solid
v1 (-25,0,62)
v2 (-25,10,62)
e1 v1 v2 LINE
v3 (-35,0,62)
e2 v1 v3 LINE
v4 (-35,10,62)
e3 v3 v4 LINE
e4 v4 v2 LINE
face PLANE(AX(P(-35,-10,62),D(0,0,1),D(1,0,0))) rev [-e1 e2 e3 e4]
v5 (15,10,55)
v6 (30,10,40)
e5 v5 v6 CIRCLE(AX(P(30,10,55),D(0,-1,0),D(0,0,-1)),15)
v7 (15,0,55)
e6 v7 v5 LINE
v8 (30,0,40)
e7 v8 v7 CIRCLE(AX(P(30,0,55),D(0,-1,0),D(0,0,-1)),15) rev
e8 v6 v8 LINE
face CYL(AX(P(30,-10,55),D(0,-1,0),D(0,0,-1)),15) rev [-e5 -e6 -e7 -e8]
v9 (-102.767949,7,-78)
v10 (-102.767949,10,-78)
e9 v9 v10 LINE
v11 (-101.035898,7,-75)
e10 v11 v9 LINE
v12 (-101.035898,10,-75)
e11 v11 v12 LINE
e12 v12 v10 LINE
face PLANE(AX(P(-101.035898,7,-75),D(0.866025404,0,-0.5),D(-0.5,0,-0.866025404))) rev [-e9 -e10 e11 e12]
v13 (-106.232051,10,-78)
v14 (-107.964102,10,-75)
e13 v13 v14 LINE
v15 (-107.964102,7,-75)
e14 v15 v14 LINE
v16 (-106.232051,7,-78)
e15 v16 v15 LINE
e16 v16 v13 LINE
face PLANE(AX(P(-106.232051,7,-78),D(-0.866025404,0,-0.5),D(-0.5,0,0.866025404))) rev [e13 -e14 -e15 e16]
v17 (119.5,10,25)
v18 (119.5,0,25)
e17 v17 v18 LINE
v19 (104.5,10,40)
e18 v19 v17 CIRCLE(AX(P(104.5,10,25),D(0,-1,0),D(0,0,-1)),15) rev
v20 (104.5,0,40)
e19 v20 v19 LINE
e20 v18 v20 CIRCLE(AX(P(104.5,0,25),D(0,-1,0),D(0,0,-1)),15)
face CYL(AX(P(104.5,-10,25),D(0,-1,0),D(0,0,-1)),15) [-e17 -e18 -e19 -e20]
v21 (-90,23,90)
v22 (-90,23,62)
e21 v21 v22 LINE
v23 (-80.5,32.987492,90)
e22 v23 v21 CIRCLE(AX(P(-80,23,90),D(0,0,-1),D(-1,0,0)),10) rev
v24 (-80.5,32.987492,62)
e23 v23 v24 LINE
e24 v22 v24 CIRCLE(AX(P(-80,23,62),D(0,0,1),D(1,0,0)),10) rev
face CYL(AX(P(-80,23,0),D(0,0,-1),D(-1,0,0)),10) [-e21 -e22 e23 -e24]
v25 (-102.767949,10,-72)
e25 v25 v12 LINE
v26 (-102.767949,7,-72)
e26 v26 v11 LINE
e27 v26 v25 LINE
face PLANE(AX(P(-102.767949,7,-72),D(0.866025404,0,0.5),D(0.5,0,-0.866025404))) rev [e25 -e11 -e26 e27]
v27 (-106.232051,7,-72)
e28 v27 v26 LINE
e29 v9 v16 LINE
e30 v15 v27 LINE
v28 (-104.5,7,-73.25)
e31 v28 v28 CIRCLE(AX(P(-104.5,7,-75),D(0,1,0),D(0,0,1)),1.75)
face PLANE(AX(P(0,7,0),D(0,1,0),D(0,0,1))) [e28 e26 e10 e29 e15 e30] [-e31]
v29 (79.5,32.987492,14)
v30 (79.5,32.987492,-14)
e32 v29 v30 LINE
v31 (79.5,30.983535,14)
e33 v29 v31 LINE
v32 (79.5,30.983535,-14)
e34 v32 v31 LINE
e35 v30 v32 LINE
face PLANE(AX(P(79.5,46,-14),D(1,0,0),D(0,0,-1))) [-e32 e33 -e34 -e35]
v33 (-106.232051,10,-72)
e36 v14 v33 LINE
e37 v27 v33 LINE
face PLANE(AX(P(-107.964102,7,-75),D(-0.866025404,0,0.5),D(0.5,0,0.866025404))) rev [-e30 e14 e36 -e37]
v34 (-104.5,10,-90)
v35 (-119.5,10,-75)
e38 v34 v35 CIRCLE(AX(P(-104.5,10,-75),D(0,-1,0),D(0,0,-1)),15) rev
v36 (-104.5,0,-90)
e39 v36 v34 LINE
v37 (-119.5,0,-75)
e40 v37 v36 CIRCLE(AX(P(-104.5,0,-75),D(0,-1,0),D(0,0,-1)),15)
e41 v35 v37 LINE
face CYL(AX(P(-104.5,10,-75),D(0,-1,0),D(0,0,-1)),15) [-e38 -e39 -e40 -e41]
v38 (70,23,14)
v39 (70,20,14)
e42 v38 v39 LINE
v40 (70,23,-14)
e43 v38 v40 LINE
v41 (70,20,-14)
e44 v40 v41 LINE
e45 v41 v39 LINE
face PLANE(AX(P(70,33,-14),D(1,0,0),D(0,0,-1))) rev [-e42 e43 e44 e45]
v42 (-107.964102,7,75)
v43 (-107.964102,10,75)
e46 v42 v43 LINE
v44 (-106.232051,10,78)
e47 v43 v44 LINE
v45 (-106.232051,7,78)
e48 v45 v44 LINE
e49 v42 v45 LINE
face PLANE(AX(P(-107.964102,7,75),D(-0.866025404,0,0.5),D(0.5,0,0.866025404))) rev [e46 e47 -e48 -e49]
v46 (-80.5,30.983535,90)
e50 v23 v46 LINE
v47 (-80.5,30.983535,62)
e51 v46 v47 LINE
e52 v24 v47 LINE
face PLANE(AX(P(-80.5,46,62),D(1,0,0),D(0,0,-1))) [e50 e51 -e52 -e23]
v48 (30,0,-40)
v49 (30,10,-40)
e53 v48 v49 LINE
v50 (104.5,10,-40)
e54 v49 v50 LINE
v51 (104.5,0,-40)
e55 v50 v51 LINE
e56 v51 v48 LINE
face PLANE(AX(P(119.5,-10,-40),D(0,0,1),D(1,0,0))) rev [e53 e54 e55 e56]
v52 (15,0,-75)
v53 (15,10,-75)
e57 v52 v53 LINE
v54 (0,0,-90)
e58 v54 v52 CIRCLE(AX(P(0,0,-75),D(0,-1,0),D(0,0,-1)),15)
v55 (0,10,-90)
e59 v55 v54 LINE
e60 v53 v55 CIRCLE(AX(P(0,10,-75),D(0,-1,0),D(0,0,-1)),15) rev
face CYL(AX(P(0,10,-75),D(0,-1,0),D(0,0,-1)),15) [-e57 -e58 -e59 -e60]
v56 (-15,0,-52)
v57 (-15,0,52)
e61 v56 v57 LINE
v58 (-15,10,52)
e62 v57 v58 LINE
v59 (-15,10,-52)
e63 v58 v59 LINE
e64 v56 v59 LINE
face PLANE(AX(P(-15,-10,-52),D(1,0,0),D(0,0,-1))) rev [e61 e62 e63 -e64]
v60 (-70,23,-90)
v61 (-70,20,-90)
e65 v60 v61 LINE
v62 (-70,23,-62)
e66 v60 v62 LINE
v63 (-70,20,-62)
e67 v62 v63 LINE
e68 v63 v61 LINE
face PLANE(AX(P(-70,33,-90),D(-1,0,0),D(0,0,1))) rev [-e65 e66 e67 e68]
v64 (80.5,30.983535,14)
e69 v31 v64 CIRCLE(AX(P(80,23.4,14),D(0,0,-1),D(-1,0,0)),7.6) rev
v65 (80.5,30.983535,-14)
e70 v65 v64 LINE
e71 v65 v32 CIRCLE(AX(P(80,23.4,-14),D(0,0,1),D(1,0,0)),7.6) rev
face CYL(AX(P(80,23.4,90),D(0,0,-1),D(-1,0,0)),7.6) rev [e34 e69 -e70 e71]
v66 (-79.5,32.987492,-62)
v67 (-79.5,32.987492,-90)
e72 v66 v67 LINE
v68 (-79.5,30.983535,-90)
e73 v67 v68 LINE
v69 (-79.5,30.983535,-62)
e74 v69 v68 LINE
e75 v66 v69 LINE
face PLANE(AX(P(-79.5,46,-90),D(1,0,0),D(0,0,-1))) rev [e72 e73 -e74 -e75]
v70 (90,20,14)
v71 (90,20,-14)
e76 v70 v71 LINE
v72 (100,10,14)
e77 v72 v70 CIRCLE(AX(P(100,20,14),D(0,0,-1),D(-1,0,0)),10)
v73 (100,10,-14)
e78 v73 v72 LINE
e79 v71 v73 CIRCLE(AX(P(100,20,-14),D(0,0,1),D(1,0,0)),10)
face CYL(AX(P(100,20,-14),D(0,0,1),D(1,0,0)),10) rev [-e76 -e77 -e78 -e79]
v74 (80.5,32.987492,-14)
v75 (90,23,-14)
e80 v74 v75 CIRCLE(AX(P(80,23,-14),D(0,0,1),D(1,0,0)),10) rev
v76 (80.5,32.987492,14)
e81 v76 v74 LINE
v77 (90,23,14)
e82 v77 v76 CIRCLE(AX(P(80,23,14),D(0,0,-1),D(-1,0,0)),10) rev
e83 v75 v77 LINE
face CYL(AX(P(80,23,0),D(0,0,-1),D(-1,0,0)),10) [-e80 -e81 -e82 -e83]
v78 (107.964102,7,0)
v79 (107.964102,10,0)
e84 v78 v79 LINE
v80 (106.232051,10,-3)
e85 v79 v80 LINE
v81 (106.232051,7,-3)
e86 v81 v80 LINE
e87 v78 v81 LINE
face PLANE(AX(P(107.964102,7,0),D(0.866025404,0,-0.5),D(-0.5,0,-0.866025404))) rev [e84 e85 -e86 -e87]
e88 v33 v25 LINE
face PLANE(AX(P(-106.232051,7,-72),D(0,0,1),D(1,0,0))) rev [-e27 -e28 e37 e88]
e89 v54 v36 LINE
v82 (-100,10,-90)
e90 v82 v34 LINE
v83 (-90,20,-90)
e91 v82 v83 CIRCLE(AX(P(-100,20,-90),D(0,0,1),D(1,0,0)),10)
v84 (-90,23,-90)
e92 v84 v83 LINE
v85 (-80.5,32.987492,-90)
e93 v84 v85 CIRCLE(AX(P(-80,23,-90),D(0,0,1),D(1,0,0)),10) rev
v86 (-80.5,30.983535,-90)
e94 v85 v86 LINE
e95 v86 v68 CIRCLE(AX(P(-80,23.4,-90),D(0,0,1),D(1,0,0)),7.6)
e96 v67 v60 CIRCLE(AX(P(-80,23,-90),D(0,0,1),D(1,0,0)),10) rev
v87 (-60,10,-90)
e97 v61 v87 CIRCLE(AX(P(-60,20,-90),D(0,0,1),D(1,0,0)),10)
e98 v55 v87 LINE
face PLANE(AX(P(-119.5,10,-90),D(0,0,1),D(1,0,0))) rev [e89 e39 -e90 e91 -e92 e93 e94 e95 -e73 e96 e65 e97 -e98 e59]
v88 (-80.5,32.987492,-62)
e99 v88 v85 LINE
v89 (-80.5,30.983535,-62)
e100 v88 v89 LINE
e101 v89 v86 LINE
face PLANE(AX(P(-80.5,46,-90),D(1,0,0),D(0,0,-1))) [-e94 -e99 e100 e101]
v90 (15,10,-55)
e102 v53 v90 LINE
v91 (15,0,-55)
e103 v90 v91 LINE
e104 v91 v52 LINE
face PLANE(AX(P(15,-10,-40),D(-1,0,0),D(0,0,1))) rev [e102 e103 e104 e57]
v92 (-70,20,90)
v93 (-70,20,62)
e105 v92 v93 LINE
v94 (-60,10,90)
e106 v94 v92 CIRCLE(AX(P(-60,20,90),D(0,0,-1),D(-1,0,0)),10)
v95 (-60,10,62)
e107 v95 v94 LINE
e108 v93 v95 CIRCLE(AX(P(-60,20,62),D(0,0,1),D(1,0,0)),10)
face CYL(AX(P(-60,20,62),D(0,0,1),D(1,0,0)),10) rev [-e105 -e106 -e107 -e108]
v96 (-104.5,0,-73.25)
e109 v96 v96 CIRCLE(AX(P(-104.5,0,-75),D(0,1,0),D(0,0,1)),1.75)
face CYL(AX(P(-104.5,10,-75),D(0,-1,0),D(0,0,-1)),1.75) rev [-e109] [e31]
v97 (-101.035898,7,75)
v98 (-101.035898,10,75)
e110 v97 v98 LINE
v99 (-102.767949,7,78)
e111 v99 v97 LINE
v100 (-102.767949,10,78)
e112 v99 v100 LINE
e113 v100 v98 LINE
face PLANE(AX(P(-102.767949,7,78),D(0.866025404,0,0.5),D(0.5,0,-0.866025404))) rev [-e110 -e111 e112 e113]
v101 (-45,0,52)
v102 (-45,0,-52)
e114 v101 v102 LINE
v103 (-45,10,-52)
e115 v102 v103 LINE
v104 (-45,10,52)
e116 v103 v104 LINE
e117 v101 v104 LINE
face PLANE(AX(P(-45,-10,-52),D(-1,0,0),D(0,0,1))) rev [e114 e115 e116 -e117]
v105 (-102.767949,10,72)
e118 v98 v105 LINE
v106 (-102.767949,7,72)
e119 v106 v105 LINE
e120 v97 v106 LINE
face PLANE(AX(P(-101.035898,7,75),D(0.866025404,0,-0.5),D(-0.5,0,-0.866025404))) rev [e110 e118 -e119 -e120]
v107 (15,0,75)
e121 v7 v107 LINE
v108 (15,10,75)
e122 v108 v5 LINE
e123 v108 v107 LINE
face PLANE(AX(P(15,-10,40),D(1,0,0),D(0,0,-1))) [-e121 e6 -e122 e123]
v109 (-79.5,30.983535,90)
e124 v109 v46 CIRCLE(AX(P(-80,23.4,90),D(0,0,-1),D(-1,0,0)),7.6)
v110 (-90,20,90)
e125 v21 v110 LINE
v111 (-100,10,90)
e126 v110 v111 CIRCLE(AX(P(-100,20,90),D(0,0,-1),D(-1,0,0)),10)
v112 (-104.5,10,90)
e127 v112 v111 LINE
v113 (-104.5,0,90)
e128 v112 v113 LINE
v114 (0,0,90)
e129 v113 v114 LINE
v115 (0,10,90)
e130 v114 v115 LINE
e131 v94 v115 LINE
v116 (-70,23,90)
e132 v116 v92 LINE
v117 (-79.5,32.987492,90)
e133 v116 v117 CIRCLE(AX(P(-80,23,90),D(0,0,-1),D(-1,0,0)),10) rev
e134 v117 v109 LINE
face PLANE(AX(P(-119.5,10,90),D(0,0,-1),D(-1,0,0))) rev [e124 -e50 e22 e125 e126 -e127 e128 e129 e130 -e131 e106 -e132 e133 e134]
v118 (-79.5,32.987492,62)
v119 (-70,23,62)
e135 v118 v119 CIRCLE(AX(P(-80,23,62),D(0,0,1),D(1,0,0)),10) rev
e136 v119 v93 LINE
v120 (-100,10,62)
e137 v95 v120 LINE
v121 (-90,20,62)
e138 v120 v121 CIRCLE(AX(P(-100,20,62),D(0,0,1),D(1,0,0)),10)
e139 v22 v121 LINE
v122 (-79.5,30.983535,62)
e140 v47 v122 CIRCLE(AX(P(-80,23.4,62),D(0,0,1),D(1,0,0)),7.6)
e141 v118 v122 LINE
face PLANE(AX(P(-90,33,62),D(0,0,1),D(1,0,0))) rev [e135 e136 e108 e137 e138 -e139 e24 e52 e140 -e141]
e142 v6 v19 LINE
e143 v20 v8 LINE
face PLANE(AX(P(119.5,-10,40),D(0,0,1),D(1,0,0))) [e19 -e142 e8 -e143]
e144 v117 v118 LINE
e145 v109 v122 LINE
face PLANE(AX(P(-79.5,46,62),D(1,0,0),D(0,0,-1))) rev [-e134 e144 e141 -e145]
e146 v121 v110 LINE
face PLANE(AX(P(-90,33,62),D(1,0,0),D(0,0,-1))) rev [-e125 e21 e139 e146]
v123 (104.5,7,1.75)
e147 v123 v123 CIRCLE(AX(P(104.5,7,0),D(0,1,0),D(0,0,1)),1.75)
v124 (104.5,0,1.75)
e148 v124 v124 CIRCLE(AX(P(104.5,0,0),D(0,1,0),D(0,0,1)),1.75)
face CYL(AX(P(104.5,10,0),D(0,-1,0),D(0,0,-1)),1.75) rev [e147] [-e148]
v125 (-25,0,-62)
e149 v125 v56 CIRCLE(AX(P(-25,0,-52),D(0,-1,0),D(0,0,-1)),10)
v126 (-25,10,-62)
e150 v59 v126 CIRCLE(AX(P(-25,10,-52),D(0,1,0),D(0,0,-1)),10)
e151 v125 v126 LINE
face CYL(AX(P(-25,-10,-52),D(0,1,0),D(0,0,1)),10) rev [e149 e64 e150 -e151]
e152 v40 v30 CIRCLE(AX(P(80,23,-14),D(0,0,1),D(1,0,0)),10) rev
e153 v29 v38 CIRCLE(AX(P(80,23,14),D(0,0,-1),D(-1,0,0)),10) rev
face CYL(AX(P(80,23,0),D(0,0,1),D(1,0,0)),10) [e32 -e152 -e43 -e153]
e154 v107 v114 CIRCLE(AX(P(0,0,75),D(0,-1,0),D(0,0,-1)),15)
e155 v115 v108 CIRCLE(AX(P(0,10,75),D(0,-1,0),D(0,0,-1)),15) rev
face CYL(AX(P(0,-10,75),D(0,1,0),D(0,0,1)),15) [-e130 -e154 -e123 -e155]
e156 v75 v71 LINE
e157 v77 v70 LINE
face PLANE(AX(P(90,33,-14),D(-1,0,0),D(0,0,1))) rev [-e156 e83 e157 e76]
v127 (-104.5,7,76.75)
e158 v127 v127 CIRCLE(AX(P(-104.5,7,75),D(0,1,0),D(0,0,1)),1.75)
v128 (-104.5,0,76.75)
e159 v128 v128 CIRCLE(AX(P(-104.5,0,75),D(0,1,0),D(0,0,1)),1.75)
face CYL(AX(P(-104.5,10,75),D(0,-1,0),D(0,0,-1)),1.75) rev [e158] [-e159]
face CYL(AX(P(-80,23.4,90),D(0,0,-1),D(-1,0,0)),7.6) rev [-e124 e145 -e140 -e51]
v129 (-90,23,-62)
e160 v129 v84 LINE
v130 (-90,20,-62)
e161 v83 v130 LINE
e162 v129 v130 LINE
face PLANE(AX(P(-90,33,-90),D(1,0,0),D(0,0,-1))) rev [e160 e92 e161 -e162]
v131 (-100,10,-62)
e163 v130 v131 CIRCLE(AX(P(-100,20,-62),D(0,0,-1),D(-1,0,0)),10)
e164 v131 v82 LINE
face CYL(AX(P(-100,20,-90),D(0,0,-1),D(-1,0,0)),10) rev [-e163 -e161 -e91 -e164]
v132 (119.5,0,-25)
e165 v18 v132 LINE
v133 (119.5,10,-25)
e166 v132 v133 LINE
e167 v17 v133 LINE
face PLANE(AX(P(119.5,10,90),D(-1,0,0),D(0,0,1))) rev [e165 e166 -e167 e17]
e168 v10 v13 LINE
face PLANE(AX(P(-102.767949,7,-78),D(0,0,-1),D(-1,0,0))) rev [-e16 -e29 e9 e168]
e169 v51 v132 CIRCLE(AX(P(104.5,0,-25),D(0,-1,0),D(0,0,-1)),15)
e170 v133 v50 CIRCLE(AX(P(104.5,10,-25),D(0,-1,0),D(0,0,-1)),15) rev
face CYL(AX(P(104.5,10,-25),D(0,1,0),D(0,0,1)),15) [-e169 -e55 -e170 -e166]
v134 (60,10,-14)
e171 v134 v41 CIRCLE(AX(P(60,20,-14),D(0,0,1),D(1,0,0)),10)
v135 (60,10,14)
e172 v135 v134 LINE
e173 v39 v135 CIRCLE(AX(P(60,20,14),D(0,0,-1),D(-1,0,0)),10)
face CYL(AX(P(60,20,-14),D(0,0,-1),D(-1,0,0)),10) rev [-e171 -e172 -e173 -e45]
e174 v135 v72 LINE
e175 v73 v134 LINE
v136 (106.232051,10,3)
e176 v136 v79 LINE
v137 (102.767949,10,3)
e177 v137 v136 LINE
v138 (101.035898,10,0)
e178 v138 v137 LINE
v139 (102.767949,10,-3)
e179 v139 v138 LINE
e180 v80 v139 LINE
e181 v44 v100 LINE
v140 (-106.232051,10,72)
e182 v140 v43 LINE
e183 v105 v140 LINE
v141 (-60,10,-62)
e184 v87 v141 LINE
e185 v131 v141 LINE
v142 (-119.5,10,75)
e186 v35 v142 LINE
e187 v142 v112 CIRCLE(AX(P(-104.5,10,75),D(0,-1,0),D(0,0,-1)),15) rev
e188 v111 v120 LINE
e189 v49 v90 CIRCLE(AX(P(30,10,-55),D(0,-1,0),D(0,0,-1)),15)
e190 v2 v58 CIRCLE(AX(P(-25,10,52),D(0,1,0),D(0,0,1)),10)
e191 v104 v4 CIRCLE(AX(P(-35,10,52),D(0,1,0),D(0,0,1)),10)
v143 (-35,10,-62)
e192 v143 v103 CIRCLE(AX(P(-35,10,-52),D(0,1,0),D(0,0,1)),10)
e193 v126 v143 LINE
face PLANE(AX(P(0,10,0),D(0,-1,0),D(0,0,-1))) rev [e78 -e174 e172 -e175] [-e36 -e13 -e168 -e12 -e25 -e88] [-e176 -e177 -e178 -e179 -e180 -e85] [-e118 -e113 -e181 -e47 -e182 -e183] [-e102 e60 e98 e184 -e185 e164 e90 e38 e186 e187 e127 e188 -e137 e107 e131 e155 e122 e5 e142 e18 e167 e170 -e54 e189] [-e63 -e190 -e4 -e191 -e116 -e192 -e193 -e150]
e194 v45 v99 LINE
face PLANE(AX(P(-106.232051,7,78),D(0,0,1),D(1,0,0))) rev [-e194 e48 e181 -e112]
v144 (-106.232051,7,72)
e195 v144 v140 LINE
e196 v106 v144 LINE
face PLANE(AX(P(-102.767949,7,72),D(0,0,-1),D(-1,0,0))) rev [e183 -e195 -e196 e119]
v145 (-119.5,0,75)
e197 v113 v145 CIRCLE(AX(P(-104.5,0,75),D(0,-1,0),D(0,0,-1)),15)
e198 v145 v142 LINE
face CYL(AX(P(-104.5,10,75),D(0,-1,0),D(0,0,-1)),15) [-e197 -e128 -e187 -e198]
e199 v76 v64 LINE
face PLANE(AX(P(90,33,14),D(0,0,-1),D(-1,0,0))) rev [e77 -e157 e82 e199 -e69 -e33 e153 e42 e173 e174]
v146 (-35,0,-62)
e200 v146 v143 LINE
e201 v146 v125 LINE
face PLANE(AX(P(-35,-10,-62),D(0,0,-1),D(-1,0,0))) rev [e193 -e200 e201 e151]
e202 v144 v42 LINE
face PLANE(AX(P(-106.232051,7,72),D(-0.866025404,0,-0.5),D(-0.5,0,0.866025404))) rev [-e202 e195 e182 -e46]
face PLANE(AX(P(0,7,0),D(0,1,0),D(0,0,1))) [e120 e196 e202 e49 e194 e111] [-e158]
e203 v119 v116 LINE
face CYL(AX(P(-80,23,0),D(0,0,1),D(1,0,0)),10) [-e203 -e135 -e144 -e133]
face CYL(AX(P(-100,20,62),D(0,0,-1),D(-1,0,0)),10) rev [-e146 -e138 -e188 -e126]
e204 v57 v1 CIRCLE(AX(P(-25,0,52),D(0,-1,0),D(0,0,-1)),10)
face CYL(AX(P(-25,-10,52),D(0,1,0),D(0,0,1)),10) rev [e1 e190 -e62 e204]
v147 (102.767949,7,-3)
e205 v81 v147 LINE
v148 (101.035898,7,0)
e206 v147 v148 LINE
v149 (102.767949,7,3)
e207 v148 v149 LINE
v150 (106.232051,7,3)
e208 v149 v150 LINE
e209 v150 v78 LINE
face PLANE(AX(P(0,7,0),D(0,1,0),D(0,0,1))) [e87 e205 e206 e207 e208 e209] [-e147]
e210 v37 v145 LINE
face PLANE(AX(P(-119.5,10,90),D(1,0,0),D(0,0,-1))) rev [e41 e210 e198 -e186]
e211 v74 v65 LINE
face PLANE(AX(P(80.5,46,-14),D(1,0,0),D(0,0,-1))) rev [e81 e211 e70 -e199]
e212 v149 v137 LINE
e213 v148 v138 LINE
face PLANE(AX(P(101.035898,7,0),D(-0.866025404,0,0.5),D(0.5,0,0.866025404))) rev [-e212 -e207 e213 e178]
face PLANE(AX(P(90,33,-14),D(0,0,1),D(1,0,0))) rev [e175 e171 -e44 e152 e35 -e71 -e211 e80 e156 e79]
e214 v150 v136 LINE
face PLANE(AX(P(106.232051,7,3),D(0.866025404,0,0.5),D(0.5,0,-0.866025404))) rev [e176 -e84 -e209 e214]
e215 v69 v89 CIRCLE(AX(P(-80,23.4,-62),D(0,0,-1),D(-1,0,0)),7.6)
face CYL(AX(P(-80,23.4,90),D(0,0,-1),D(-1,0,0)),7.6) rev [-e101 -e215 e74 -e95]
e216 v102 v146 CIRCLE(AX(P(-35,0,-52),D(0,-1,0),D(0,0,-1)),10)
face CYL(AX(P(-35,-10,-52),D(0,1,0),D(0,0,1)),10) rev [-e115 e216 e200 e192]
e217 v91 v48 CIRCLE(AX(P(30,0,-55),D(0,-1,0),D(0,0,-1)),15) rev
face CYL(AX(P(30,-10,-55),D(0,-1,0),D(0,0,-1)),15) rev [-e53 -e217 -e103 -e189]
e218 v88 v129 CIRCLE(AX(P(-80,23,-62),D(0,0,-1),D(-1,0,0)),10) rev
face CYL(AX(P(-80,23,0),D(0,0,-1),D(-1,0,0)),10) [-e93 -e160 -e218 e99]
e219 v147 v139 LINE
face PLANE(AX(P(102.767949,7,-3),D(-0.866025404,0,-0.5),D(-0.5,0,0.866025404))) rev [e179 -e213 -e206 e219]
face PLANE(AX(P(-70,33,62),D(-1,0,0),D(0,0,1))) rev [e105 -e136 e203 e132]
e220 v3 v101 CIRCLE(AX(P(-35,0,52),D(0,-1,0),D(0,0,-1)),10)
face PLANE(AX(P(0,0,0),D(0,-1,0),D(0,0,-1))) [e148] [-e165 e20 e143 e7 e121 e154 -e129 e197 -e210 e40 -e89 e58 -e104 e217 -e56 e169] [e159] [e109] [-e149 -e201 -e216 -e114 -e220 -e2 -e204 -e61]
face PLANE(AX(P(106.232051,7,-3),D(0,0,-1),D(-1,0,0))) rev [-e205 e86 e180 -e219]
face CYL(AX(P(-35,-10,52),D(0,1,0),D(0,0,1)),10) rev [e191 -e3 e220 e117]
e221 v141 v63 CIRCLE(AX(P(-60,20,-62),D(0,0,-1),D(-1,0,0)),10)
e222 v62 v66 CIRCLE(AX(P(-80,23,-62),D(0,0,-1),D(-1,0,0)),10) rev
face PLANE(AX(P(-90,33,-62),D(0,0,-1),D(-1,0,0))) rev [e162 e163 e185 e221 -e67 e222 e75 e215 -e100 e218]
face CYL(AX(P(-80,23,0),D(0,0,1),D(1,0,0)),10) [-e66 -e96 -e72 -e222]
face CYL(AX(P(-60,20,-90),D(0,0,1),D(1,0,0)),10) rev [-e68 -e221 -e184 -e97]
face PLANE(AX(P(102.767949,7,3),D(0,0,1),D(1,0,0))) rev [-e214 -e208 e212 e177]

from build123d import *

# Parameters (mm, degrees)
SKETCH1_W               = 239
SKETCH1_H               = 180
SKETCH1_R               = 1.75
BOSS_EXTRUDE1_DEPTH     = 10
SKETCH2_W               = 20
SKETCH2_H               = 28
BOSS_EXTRUDE2_DEPTH     = 23
SKETCH3_R               = 7.6
CUT_EXTRUDE1_DEPTH      = 219.561776164
FILLET1_R               = 10
FILLET2_R               = 10
CUT_EXTRUDE2_DEPTH      = 20
SKETCH5_W               = 104.5
SKETCH5_H               = 50
CUT_EXTRUDE3_DEPTH      = 20
FILLET3_R               = 15
FILLET4_R               = 15
CUT_EXTRUDE4_DEPTH      = 3
SKETCH7_W               = 1
SKETCH7_H               = 35.181003967
SKETCH7_H_2             = 30.639156463
SKETCH7_H_3             = 31.227118238
CUT_EXTRUDE_THIN1_DEPTH = 21


with BuildPart() as part:
    # Sketch1 → Boss-Extrude1 (new body)
    with BuildSketch(Plane(origin=(0, 0, 0), x_dir=(1, 0, 0), z_dir=(0, 1, 0))):
        Rectangle(SKETCH1_W, SKETCH1_H)
        with Locations(Location((104.5, 0, 0), (0, 0, 270))):
            Circle(SKETCH1_R, mode=Mode.SUBTRACT)
        with Locations(Location((-104.5, 75, 0), (0, 0, 270))):
            Circle(SKETCH1_R, mode=Mode.SUBTRACT)
        with Locations(Location((-104.5, -75, 0), (0, 0, 270))):
            Circle(SKETCH1_R, mode=Mode.SUBTRACT)
    extrude(amount=BOSS_EXTRUDE1_DEPTH)

    # Sketch2 → Boss-Extrude2 (add)
    with BuildSketch(Plane(origin=(0, 10, 0), x_dir=(1, 0, 0), z_dir=(0, 1, 0))):
        with Locations((-80, 76)):
            Rectangle(SKETCH2_W, SKETCH2_H)
        with Locations((-80, -76)):
            Rectangle(SKETCH2_W, SKETCH2_H)
        with Locations((80, 0)):
            Rectangle(SKETCH2_W, SKETCH2_H)
    extrude(amount=BOSS_EXTRUDE2_DEPTH)

    # Sketch3 → Cut-Extrude1 (cut, symmetric)
    with BuildSketch(Plane(origin=(0, 0, -90), x_dir=(-1, 0, 0), z_dir=(0, 0, -1))):
        with Locations((80, 23.4)):
            Circle(SKETCH3_R)
    cut_extrude1 = extrude(amount=CUT_EXTRUDE1_DEPTH, both=True, mode=Mode.SUBTRACT)

    # Fillet1
    fillet1_edges = [part.edges().sort_by_distance(p)[0] for p in [
        (90, 33, 0),
        (70, 33, 0),
        (-90, 33, 76),
        (-70, 33, 76),
        (-70, 33, -76),
        (-90, 33, -76),
    ]]
    fillet(fillet1_edges, radius=FILLET1_R - 0.0001)  # a hair under: the kernel refuses the full size

    # Mirror1: Cut-Extrude1 across plane
    add(cut_extrude1.mirror(Plane(origin=(0, 0, 0), x_dir=(0, 0, 1), z_dir=(1, 0, 0))), mode=Mode.SUBTRACT)

    # Fillet2
    fillet2_edges = [part.edges().sort_by_distance(p)[0] for p in [
        (-70, 10, -76),
        (-90, 10, -76),
        (-70, 10, 76),
        (-90, 10, 76),
        (70, 10, 0),
        (90, 10, 0),
    ]]
    fillet(fillet2_edges, radius=FILLET2_R)

    # Sketch4 → Cut-Extrude2 (cut)
    with BuildSketch(Plane(origin=(0, 10, 0), x_dir=(1, 0, 0), z_dir=(0, 1, 0))):
        with BuildLine():
            Line((-35, 62), (-25, 62))
            ThreePointArc((-25, 62), (-17.928932188, 59.071067812), (-15, 52))
            Line((-15, 52), (-15, -52))
            ThreePointArc((-15, -52), (-17.928932188, -59.071067812), (-25, -62))
            Line((-25, -62), (-35, -62))
            ThreePointArc((-35, -62), (-42.071067812, -59.071067812), (-45, -52))
            Line((-45, -52), (-45, 52))
            ThreePointArc((-45, 52), (-42.071067812, 59.071067812), (-35, 62))
        make_face()
    extrude(amount=-CUT_EXTRUDE2_DEPTH, mode=Mode.SUBTRACT)

    # Sketch5 → Cut-Extrude3 (cut)
    with BuildSketch(Plane(origin=(0, 10, 0), x_dir=(1, 0, 0), z_dir=(0, 1, 0))):
        with Locations((67.25, 65)):
            Rectangle(SKETCH5_W, SKETCH5_H)
    cut_extrude3 = extrude(amount=-CUT_EXTRUDE3_DEPTH, mode=Mode.SUBTRACT)

    # Fillet3
    fillet3_edges = [part.edges().sort_by_distance(p)[0] for p in [
        (15, 5, -90),
        (119.5, 5, -40),
        (15, 5, -40),
        (-119.5, 5, -90),
    ]]
    fillet(fillet3_edges, radius=FILLET3_R)

    # Mirror2: Cut-Extrude3 across plane
    add(cut_extrude3.mirror(Plane.XY), mode=Mode.SUBTRACT)

    # Fillet4
    fillet4_edges = [part.edges().sort_by_distance(p)[0] for p in [
        (15, 5, 90),
        (119.5, 5, 40),
        (15, 5, 40),
        (-119.5, 5, 90),
    ]]
    fillet(fillet4_edges, radius=FILLET4_R)

    # Sketch6 → Cut-Extrude4 (cut)
    with BuildSketch(Plane(origin=(0, 10, 0), x_dir=(1, 0, 0), z_dir=(0, 1, 0))):
        Polygon((-107.964101615, -75), (-106.232050808, -78), (-102.767949192, -78), (-101.035898385, -75), (-102.767949192, -72), (-106.232050808, -72), align=None)
        Polygon((-107.964101615, 75), (-106.232050808, 72), (-102.767949192, 72), (-101.035898385, 75), (-102.767949192, 78), (-106.232050808, 78), align=None)
        Polygon((107.964101615, 0), (106.232050808, 3), (102.767949192, 3), (101.035898385, 0), (102.767949192, -3), (106.232050808, -3), align=None)
    extrude(amount=-CUT_EXTRUDE4_DEPTH, mode=Mode.SUBTRACT)

    # Sketch7 → Cut-Extrude-Thin1 (cut)
    with BuildSketch(Plane(origin=(0, 25, 0), x_dir=(1, 0, 0), z_dir=(0, 1, 0))):
        with Locations((-80, -79.590501984)):
            Rectangle(SKETCH7_W, SKETCH7_H)
        with Locations((-80, 74.680421768)):
            Rectangle(SKETCH7_W, SKETCH7_H_2)
        with Locations((80, -1.613559119)):
            Rectangle(SKETCH7_W, SKETCH7_H_3)
    extrude(amount=CUT_EXTRUDE_THIN1_DEPTH, mode=Mode.SUBTRACT)


solid = part.part
